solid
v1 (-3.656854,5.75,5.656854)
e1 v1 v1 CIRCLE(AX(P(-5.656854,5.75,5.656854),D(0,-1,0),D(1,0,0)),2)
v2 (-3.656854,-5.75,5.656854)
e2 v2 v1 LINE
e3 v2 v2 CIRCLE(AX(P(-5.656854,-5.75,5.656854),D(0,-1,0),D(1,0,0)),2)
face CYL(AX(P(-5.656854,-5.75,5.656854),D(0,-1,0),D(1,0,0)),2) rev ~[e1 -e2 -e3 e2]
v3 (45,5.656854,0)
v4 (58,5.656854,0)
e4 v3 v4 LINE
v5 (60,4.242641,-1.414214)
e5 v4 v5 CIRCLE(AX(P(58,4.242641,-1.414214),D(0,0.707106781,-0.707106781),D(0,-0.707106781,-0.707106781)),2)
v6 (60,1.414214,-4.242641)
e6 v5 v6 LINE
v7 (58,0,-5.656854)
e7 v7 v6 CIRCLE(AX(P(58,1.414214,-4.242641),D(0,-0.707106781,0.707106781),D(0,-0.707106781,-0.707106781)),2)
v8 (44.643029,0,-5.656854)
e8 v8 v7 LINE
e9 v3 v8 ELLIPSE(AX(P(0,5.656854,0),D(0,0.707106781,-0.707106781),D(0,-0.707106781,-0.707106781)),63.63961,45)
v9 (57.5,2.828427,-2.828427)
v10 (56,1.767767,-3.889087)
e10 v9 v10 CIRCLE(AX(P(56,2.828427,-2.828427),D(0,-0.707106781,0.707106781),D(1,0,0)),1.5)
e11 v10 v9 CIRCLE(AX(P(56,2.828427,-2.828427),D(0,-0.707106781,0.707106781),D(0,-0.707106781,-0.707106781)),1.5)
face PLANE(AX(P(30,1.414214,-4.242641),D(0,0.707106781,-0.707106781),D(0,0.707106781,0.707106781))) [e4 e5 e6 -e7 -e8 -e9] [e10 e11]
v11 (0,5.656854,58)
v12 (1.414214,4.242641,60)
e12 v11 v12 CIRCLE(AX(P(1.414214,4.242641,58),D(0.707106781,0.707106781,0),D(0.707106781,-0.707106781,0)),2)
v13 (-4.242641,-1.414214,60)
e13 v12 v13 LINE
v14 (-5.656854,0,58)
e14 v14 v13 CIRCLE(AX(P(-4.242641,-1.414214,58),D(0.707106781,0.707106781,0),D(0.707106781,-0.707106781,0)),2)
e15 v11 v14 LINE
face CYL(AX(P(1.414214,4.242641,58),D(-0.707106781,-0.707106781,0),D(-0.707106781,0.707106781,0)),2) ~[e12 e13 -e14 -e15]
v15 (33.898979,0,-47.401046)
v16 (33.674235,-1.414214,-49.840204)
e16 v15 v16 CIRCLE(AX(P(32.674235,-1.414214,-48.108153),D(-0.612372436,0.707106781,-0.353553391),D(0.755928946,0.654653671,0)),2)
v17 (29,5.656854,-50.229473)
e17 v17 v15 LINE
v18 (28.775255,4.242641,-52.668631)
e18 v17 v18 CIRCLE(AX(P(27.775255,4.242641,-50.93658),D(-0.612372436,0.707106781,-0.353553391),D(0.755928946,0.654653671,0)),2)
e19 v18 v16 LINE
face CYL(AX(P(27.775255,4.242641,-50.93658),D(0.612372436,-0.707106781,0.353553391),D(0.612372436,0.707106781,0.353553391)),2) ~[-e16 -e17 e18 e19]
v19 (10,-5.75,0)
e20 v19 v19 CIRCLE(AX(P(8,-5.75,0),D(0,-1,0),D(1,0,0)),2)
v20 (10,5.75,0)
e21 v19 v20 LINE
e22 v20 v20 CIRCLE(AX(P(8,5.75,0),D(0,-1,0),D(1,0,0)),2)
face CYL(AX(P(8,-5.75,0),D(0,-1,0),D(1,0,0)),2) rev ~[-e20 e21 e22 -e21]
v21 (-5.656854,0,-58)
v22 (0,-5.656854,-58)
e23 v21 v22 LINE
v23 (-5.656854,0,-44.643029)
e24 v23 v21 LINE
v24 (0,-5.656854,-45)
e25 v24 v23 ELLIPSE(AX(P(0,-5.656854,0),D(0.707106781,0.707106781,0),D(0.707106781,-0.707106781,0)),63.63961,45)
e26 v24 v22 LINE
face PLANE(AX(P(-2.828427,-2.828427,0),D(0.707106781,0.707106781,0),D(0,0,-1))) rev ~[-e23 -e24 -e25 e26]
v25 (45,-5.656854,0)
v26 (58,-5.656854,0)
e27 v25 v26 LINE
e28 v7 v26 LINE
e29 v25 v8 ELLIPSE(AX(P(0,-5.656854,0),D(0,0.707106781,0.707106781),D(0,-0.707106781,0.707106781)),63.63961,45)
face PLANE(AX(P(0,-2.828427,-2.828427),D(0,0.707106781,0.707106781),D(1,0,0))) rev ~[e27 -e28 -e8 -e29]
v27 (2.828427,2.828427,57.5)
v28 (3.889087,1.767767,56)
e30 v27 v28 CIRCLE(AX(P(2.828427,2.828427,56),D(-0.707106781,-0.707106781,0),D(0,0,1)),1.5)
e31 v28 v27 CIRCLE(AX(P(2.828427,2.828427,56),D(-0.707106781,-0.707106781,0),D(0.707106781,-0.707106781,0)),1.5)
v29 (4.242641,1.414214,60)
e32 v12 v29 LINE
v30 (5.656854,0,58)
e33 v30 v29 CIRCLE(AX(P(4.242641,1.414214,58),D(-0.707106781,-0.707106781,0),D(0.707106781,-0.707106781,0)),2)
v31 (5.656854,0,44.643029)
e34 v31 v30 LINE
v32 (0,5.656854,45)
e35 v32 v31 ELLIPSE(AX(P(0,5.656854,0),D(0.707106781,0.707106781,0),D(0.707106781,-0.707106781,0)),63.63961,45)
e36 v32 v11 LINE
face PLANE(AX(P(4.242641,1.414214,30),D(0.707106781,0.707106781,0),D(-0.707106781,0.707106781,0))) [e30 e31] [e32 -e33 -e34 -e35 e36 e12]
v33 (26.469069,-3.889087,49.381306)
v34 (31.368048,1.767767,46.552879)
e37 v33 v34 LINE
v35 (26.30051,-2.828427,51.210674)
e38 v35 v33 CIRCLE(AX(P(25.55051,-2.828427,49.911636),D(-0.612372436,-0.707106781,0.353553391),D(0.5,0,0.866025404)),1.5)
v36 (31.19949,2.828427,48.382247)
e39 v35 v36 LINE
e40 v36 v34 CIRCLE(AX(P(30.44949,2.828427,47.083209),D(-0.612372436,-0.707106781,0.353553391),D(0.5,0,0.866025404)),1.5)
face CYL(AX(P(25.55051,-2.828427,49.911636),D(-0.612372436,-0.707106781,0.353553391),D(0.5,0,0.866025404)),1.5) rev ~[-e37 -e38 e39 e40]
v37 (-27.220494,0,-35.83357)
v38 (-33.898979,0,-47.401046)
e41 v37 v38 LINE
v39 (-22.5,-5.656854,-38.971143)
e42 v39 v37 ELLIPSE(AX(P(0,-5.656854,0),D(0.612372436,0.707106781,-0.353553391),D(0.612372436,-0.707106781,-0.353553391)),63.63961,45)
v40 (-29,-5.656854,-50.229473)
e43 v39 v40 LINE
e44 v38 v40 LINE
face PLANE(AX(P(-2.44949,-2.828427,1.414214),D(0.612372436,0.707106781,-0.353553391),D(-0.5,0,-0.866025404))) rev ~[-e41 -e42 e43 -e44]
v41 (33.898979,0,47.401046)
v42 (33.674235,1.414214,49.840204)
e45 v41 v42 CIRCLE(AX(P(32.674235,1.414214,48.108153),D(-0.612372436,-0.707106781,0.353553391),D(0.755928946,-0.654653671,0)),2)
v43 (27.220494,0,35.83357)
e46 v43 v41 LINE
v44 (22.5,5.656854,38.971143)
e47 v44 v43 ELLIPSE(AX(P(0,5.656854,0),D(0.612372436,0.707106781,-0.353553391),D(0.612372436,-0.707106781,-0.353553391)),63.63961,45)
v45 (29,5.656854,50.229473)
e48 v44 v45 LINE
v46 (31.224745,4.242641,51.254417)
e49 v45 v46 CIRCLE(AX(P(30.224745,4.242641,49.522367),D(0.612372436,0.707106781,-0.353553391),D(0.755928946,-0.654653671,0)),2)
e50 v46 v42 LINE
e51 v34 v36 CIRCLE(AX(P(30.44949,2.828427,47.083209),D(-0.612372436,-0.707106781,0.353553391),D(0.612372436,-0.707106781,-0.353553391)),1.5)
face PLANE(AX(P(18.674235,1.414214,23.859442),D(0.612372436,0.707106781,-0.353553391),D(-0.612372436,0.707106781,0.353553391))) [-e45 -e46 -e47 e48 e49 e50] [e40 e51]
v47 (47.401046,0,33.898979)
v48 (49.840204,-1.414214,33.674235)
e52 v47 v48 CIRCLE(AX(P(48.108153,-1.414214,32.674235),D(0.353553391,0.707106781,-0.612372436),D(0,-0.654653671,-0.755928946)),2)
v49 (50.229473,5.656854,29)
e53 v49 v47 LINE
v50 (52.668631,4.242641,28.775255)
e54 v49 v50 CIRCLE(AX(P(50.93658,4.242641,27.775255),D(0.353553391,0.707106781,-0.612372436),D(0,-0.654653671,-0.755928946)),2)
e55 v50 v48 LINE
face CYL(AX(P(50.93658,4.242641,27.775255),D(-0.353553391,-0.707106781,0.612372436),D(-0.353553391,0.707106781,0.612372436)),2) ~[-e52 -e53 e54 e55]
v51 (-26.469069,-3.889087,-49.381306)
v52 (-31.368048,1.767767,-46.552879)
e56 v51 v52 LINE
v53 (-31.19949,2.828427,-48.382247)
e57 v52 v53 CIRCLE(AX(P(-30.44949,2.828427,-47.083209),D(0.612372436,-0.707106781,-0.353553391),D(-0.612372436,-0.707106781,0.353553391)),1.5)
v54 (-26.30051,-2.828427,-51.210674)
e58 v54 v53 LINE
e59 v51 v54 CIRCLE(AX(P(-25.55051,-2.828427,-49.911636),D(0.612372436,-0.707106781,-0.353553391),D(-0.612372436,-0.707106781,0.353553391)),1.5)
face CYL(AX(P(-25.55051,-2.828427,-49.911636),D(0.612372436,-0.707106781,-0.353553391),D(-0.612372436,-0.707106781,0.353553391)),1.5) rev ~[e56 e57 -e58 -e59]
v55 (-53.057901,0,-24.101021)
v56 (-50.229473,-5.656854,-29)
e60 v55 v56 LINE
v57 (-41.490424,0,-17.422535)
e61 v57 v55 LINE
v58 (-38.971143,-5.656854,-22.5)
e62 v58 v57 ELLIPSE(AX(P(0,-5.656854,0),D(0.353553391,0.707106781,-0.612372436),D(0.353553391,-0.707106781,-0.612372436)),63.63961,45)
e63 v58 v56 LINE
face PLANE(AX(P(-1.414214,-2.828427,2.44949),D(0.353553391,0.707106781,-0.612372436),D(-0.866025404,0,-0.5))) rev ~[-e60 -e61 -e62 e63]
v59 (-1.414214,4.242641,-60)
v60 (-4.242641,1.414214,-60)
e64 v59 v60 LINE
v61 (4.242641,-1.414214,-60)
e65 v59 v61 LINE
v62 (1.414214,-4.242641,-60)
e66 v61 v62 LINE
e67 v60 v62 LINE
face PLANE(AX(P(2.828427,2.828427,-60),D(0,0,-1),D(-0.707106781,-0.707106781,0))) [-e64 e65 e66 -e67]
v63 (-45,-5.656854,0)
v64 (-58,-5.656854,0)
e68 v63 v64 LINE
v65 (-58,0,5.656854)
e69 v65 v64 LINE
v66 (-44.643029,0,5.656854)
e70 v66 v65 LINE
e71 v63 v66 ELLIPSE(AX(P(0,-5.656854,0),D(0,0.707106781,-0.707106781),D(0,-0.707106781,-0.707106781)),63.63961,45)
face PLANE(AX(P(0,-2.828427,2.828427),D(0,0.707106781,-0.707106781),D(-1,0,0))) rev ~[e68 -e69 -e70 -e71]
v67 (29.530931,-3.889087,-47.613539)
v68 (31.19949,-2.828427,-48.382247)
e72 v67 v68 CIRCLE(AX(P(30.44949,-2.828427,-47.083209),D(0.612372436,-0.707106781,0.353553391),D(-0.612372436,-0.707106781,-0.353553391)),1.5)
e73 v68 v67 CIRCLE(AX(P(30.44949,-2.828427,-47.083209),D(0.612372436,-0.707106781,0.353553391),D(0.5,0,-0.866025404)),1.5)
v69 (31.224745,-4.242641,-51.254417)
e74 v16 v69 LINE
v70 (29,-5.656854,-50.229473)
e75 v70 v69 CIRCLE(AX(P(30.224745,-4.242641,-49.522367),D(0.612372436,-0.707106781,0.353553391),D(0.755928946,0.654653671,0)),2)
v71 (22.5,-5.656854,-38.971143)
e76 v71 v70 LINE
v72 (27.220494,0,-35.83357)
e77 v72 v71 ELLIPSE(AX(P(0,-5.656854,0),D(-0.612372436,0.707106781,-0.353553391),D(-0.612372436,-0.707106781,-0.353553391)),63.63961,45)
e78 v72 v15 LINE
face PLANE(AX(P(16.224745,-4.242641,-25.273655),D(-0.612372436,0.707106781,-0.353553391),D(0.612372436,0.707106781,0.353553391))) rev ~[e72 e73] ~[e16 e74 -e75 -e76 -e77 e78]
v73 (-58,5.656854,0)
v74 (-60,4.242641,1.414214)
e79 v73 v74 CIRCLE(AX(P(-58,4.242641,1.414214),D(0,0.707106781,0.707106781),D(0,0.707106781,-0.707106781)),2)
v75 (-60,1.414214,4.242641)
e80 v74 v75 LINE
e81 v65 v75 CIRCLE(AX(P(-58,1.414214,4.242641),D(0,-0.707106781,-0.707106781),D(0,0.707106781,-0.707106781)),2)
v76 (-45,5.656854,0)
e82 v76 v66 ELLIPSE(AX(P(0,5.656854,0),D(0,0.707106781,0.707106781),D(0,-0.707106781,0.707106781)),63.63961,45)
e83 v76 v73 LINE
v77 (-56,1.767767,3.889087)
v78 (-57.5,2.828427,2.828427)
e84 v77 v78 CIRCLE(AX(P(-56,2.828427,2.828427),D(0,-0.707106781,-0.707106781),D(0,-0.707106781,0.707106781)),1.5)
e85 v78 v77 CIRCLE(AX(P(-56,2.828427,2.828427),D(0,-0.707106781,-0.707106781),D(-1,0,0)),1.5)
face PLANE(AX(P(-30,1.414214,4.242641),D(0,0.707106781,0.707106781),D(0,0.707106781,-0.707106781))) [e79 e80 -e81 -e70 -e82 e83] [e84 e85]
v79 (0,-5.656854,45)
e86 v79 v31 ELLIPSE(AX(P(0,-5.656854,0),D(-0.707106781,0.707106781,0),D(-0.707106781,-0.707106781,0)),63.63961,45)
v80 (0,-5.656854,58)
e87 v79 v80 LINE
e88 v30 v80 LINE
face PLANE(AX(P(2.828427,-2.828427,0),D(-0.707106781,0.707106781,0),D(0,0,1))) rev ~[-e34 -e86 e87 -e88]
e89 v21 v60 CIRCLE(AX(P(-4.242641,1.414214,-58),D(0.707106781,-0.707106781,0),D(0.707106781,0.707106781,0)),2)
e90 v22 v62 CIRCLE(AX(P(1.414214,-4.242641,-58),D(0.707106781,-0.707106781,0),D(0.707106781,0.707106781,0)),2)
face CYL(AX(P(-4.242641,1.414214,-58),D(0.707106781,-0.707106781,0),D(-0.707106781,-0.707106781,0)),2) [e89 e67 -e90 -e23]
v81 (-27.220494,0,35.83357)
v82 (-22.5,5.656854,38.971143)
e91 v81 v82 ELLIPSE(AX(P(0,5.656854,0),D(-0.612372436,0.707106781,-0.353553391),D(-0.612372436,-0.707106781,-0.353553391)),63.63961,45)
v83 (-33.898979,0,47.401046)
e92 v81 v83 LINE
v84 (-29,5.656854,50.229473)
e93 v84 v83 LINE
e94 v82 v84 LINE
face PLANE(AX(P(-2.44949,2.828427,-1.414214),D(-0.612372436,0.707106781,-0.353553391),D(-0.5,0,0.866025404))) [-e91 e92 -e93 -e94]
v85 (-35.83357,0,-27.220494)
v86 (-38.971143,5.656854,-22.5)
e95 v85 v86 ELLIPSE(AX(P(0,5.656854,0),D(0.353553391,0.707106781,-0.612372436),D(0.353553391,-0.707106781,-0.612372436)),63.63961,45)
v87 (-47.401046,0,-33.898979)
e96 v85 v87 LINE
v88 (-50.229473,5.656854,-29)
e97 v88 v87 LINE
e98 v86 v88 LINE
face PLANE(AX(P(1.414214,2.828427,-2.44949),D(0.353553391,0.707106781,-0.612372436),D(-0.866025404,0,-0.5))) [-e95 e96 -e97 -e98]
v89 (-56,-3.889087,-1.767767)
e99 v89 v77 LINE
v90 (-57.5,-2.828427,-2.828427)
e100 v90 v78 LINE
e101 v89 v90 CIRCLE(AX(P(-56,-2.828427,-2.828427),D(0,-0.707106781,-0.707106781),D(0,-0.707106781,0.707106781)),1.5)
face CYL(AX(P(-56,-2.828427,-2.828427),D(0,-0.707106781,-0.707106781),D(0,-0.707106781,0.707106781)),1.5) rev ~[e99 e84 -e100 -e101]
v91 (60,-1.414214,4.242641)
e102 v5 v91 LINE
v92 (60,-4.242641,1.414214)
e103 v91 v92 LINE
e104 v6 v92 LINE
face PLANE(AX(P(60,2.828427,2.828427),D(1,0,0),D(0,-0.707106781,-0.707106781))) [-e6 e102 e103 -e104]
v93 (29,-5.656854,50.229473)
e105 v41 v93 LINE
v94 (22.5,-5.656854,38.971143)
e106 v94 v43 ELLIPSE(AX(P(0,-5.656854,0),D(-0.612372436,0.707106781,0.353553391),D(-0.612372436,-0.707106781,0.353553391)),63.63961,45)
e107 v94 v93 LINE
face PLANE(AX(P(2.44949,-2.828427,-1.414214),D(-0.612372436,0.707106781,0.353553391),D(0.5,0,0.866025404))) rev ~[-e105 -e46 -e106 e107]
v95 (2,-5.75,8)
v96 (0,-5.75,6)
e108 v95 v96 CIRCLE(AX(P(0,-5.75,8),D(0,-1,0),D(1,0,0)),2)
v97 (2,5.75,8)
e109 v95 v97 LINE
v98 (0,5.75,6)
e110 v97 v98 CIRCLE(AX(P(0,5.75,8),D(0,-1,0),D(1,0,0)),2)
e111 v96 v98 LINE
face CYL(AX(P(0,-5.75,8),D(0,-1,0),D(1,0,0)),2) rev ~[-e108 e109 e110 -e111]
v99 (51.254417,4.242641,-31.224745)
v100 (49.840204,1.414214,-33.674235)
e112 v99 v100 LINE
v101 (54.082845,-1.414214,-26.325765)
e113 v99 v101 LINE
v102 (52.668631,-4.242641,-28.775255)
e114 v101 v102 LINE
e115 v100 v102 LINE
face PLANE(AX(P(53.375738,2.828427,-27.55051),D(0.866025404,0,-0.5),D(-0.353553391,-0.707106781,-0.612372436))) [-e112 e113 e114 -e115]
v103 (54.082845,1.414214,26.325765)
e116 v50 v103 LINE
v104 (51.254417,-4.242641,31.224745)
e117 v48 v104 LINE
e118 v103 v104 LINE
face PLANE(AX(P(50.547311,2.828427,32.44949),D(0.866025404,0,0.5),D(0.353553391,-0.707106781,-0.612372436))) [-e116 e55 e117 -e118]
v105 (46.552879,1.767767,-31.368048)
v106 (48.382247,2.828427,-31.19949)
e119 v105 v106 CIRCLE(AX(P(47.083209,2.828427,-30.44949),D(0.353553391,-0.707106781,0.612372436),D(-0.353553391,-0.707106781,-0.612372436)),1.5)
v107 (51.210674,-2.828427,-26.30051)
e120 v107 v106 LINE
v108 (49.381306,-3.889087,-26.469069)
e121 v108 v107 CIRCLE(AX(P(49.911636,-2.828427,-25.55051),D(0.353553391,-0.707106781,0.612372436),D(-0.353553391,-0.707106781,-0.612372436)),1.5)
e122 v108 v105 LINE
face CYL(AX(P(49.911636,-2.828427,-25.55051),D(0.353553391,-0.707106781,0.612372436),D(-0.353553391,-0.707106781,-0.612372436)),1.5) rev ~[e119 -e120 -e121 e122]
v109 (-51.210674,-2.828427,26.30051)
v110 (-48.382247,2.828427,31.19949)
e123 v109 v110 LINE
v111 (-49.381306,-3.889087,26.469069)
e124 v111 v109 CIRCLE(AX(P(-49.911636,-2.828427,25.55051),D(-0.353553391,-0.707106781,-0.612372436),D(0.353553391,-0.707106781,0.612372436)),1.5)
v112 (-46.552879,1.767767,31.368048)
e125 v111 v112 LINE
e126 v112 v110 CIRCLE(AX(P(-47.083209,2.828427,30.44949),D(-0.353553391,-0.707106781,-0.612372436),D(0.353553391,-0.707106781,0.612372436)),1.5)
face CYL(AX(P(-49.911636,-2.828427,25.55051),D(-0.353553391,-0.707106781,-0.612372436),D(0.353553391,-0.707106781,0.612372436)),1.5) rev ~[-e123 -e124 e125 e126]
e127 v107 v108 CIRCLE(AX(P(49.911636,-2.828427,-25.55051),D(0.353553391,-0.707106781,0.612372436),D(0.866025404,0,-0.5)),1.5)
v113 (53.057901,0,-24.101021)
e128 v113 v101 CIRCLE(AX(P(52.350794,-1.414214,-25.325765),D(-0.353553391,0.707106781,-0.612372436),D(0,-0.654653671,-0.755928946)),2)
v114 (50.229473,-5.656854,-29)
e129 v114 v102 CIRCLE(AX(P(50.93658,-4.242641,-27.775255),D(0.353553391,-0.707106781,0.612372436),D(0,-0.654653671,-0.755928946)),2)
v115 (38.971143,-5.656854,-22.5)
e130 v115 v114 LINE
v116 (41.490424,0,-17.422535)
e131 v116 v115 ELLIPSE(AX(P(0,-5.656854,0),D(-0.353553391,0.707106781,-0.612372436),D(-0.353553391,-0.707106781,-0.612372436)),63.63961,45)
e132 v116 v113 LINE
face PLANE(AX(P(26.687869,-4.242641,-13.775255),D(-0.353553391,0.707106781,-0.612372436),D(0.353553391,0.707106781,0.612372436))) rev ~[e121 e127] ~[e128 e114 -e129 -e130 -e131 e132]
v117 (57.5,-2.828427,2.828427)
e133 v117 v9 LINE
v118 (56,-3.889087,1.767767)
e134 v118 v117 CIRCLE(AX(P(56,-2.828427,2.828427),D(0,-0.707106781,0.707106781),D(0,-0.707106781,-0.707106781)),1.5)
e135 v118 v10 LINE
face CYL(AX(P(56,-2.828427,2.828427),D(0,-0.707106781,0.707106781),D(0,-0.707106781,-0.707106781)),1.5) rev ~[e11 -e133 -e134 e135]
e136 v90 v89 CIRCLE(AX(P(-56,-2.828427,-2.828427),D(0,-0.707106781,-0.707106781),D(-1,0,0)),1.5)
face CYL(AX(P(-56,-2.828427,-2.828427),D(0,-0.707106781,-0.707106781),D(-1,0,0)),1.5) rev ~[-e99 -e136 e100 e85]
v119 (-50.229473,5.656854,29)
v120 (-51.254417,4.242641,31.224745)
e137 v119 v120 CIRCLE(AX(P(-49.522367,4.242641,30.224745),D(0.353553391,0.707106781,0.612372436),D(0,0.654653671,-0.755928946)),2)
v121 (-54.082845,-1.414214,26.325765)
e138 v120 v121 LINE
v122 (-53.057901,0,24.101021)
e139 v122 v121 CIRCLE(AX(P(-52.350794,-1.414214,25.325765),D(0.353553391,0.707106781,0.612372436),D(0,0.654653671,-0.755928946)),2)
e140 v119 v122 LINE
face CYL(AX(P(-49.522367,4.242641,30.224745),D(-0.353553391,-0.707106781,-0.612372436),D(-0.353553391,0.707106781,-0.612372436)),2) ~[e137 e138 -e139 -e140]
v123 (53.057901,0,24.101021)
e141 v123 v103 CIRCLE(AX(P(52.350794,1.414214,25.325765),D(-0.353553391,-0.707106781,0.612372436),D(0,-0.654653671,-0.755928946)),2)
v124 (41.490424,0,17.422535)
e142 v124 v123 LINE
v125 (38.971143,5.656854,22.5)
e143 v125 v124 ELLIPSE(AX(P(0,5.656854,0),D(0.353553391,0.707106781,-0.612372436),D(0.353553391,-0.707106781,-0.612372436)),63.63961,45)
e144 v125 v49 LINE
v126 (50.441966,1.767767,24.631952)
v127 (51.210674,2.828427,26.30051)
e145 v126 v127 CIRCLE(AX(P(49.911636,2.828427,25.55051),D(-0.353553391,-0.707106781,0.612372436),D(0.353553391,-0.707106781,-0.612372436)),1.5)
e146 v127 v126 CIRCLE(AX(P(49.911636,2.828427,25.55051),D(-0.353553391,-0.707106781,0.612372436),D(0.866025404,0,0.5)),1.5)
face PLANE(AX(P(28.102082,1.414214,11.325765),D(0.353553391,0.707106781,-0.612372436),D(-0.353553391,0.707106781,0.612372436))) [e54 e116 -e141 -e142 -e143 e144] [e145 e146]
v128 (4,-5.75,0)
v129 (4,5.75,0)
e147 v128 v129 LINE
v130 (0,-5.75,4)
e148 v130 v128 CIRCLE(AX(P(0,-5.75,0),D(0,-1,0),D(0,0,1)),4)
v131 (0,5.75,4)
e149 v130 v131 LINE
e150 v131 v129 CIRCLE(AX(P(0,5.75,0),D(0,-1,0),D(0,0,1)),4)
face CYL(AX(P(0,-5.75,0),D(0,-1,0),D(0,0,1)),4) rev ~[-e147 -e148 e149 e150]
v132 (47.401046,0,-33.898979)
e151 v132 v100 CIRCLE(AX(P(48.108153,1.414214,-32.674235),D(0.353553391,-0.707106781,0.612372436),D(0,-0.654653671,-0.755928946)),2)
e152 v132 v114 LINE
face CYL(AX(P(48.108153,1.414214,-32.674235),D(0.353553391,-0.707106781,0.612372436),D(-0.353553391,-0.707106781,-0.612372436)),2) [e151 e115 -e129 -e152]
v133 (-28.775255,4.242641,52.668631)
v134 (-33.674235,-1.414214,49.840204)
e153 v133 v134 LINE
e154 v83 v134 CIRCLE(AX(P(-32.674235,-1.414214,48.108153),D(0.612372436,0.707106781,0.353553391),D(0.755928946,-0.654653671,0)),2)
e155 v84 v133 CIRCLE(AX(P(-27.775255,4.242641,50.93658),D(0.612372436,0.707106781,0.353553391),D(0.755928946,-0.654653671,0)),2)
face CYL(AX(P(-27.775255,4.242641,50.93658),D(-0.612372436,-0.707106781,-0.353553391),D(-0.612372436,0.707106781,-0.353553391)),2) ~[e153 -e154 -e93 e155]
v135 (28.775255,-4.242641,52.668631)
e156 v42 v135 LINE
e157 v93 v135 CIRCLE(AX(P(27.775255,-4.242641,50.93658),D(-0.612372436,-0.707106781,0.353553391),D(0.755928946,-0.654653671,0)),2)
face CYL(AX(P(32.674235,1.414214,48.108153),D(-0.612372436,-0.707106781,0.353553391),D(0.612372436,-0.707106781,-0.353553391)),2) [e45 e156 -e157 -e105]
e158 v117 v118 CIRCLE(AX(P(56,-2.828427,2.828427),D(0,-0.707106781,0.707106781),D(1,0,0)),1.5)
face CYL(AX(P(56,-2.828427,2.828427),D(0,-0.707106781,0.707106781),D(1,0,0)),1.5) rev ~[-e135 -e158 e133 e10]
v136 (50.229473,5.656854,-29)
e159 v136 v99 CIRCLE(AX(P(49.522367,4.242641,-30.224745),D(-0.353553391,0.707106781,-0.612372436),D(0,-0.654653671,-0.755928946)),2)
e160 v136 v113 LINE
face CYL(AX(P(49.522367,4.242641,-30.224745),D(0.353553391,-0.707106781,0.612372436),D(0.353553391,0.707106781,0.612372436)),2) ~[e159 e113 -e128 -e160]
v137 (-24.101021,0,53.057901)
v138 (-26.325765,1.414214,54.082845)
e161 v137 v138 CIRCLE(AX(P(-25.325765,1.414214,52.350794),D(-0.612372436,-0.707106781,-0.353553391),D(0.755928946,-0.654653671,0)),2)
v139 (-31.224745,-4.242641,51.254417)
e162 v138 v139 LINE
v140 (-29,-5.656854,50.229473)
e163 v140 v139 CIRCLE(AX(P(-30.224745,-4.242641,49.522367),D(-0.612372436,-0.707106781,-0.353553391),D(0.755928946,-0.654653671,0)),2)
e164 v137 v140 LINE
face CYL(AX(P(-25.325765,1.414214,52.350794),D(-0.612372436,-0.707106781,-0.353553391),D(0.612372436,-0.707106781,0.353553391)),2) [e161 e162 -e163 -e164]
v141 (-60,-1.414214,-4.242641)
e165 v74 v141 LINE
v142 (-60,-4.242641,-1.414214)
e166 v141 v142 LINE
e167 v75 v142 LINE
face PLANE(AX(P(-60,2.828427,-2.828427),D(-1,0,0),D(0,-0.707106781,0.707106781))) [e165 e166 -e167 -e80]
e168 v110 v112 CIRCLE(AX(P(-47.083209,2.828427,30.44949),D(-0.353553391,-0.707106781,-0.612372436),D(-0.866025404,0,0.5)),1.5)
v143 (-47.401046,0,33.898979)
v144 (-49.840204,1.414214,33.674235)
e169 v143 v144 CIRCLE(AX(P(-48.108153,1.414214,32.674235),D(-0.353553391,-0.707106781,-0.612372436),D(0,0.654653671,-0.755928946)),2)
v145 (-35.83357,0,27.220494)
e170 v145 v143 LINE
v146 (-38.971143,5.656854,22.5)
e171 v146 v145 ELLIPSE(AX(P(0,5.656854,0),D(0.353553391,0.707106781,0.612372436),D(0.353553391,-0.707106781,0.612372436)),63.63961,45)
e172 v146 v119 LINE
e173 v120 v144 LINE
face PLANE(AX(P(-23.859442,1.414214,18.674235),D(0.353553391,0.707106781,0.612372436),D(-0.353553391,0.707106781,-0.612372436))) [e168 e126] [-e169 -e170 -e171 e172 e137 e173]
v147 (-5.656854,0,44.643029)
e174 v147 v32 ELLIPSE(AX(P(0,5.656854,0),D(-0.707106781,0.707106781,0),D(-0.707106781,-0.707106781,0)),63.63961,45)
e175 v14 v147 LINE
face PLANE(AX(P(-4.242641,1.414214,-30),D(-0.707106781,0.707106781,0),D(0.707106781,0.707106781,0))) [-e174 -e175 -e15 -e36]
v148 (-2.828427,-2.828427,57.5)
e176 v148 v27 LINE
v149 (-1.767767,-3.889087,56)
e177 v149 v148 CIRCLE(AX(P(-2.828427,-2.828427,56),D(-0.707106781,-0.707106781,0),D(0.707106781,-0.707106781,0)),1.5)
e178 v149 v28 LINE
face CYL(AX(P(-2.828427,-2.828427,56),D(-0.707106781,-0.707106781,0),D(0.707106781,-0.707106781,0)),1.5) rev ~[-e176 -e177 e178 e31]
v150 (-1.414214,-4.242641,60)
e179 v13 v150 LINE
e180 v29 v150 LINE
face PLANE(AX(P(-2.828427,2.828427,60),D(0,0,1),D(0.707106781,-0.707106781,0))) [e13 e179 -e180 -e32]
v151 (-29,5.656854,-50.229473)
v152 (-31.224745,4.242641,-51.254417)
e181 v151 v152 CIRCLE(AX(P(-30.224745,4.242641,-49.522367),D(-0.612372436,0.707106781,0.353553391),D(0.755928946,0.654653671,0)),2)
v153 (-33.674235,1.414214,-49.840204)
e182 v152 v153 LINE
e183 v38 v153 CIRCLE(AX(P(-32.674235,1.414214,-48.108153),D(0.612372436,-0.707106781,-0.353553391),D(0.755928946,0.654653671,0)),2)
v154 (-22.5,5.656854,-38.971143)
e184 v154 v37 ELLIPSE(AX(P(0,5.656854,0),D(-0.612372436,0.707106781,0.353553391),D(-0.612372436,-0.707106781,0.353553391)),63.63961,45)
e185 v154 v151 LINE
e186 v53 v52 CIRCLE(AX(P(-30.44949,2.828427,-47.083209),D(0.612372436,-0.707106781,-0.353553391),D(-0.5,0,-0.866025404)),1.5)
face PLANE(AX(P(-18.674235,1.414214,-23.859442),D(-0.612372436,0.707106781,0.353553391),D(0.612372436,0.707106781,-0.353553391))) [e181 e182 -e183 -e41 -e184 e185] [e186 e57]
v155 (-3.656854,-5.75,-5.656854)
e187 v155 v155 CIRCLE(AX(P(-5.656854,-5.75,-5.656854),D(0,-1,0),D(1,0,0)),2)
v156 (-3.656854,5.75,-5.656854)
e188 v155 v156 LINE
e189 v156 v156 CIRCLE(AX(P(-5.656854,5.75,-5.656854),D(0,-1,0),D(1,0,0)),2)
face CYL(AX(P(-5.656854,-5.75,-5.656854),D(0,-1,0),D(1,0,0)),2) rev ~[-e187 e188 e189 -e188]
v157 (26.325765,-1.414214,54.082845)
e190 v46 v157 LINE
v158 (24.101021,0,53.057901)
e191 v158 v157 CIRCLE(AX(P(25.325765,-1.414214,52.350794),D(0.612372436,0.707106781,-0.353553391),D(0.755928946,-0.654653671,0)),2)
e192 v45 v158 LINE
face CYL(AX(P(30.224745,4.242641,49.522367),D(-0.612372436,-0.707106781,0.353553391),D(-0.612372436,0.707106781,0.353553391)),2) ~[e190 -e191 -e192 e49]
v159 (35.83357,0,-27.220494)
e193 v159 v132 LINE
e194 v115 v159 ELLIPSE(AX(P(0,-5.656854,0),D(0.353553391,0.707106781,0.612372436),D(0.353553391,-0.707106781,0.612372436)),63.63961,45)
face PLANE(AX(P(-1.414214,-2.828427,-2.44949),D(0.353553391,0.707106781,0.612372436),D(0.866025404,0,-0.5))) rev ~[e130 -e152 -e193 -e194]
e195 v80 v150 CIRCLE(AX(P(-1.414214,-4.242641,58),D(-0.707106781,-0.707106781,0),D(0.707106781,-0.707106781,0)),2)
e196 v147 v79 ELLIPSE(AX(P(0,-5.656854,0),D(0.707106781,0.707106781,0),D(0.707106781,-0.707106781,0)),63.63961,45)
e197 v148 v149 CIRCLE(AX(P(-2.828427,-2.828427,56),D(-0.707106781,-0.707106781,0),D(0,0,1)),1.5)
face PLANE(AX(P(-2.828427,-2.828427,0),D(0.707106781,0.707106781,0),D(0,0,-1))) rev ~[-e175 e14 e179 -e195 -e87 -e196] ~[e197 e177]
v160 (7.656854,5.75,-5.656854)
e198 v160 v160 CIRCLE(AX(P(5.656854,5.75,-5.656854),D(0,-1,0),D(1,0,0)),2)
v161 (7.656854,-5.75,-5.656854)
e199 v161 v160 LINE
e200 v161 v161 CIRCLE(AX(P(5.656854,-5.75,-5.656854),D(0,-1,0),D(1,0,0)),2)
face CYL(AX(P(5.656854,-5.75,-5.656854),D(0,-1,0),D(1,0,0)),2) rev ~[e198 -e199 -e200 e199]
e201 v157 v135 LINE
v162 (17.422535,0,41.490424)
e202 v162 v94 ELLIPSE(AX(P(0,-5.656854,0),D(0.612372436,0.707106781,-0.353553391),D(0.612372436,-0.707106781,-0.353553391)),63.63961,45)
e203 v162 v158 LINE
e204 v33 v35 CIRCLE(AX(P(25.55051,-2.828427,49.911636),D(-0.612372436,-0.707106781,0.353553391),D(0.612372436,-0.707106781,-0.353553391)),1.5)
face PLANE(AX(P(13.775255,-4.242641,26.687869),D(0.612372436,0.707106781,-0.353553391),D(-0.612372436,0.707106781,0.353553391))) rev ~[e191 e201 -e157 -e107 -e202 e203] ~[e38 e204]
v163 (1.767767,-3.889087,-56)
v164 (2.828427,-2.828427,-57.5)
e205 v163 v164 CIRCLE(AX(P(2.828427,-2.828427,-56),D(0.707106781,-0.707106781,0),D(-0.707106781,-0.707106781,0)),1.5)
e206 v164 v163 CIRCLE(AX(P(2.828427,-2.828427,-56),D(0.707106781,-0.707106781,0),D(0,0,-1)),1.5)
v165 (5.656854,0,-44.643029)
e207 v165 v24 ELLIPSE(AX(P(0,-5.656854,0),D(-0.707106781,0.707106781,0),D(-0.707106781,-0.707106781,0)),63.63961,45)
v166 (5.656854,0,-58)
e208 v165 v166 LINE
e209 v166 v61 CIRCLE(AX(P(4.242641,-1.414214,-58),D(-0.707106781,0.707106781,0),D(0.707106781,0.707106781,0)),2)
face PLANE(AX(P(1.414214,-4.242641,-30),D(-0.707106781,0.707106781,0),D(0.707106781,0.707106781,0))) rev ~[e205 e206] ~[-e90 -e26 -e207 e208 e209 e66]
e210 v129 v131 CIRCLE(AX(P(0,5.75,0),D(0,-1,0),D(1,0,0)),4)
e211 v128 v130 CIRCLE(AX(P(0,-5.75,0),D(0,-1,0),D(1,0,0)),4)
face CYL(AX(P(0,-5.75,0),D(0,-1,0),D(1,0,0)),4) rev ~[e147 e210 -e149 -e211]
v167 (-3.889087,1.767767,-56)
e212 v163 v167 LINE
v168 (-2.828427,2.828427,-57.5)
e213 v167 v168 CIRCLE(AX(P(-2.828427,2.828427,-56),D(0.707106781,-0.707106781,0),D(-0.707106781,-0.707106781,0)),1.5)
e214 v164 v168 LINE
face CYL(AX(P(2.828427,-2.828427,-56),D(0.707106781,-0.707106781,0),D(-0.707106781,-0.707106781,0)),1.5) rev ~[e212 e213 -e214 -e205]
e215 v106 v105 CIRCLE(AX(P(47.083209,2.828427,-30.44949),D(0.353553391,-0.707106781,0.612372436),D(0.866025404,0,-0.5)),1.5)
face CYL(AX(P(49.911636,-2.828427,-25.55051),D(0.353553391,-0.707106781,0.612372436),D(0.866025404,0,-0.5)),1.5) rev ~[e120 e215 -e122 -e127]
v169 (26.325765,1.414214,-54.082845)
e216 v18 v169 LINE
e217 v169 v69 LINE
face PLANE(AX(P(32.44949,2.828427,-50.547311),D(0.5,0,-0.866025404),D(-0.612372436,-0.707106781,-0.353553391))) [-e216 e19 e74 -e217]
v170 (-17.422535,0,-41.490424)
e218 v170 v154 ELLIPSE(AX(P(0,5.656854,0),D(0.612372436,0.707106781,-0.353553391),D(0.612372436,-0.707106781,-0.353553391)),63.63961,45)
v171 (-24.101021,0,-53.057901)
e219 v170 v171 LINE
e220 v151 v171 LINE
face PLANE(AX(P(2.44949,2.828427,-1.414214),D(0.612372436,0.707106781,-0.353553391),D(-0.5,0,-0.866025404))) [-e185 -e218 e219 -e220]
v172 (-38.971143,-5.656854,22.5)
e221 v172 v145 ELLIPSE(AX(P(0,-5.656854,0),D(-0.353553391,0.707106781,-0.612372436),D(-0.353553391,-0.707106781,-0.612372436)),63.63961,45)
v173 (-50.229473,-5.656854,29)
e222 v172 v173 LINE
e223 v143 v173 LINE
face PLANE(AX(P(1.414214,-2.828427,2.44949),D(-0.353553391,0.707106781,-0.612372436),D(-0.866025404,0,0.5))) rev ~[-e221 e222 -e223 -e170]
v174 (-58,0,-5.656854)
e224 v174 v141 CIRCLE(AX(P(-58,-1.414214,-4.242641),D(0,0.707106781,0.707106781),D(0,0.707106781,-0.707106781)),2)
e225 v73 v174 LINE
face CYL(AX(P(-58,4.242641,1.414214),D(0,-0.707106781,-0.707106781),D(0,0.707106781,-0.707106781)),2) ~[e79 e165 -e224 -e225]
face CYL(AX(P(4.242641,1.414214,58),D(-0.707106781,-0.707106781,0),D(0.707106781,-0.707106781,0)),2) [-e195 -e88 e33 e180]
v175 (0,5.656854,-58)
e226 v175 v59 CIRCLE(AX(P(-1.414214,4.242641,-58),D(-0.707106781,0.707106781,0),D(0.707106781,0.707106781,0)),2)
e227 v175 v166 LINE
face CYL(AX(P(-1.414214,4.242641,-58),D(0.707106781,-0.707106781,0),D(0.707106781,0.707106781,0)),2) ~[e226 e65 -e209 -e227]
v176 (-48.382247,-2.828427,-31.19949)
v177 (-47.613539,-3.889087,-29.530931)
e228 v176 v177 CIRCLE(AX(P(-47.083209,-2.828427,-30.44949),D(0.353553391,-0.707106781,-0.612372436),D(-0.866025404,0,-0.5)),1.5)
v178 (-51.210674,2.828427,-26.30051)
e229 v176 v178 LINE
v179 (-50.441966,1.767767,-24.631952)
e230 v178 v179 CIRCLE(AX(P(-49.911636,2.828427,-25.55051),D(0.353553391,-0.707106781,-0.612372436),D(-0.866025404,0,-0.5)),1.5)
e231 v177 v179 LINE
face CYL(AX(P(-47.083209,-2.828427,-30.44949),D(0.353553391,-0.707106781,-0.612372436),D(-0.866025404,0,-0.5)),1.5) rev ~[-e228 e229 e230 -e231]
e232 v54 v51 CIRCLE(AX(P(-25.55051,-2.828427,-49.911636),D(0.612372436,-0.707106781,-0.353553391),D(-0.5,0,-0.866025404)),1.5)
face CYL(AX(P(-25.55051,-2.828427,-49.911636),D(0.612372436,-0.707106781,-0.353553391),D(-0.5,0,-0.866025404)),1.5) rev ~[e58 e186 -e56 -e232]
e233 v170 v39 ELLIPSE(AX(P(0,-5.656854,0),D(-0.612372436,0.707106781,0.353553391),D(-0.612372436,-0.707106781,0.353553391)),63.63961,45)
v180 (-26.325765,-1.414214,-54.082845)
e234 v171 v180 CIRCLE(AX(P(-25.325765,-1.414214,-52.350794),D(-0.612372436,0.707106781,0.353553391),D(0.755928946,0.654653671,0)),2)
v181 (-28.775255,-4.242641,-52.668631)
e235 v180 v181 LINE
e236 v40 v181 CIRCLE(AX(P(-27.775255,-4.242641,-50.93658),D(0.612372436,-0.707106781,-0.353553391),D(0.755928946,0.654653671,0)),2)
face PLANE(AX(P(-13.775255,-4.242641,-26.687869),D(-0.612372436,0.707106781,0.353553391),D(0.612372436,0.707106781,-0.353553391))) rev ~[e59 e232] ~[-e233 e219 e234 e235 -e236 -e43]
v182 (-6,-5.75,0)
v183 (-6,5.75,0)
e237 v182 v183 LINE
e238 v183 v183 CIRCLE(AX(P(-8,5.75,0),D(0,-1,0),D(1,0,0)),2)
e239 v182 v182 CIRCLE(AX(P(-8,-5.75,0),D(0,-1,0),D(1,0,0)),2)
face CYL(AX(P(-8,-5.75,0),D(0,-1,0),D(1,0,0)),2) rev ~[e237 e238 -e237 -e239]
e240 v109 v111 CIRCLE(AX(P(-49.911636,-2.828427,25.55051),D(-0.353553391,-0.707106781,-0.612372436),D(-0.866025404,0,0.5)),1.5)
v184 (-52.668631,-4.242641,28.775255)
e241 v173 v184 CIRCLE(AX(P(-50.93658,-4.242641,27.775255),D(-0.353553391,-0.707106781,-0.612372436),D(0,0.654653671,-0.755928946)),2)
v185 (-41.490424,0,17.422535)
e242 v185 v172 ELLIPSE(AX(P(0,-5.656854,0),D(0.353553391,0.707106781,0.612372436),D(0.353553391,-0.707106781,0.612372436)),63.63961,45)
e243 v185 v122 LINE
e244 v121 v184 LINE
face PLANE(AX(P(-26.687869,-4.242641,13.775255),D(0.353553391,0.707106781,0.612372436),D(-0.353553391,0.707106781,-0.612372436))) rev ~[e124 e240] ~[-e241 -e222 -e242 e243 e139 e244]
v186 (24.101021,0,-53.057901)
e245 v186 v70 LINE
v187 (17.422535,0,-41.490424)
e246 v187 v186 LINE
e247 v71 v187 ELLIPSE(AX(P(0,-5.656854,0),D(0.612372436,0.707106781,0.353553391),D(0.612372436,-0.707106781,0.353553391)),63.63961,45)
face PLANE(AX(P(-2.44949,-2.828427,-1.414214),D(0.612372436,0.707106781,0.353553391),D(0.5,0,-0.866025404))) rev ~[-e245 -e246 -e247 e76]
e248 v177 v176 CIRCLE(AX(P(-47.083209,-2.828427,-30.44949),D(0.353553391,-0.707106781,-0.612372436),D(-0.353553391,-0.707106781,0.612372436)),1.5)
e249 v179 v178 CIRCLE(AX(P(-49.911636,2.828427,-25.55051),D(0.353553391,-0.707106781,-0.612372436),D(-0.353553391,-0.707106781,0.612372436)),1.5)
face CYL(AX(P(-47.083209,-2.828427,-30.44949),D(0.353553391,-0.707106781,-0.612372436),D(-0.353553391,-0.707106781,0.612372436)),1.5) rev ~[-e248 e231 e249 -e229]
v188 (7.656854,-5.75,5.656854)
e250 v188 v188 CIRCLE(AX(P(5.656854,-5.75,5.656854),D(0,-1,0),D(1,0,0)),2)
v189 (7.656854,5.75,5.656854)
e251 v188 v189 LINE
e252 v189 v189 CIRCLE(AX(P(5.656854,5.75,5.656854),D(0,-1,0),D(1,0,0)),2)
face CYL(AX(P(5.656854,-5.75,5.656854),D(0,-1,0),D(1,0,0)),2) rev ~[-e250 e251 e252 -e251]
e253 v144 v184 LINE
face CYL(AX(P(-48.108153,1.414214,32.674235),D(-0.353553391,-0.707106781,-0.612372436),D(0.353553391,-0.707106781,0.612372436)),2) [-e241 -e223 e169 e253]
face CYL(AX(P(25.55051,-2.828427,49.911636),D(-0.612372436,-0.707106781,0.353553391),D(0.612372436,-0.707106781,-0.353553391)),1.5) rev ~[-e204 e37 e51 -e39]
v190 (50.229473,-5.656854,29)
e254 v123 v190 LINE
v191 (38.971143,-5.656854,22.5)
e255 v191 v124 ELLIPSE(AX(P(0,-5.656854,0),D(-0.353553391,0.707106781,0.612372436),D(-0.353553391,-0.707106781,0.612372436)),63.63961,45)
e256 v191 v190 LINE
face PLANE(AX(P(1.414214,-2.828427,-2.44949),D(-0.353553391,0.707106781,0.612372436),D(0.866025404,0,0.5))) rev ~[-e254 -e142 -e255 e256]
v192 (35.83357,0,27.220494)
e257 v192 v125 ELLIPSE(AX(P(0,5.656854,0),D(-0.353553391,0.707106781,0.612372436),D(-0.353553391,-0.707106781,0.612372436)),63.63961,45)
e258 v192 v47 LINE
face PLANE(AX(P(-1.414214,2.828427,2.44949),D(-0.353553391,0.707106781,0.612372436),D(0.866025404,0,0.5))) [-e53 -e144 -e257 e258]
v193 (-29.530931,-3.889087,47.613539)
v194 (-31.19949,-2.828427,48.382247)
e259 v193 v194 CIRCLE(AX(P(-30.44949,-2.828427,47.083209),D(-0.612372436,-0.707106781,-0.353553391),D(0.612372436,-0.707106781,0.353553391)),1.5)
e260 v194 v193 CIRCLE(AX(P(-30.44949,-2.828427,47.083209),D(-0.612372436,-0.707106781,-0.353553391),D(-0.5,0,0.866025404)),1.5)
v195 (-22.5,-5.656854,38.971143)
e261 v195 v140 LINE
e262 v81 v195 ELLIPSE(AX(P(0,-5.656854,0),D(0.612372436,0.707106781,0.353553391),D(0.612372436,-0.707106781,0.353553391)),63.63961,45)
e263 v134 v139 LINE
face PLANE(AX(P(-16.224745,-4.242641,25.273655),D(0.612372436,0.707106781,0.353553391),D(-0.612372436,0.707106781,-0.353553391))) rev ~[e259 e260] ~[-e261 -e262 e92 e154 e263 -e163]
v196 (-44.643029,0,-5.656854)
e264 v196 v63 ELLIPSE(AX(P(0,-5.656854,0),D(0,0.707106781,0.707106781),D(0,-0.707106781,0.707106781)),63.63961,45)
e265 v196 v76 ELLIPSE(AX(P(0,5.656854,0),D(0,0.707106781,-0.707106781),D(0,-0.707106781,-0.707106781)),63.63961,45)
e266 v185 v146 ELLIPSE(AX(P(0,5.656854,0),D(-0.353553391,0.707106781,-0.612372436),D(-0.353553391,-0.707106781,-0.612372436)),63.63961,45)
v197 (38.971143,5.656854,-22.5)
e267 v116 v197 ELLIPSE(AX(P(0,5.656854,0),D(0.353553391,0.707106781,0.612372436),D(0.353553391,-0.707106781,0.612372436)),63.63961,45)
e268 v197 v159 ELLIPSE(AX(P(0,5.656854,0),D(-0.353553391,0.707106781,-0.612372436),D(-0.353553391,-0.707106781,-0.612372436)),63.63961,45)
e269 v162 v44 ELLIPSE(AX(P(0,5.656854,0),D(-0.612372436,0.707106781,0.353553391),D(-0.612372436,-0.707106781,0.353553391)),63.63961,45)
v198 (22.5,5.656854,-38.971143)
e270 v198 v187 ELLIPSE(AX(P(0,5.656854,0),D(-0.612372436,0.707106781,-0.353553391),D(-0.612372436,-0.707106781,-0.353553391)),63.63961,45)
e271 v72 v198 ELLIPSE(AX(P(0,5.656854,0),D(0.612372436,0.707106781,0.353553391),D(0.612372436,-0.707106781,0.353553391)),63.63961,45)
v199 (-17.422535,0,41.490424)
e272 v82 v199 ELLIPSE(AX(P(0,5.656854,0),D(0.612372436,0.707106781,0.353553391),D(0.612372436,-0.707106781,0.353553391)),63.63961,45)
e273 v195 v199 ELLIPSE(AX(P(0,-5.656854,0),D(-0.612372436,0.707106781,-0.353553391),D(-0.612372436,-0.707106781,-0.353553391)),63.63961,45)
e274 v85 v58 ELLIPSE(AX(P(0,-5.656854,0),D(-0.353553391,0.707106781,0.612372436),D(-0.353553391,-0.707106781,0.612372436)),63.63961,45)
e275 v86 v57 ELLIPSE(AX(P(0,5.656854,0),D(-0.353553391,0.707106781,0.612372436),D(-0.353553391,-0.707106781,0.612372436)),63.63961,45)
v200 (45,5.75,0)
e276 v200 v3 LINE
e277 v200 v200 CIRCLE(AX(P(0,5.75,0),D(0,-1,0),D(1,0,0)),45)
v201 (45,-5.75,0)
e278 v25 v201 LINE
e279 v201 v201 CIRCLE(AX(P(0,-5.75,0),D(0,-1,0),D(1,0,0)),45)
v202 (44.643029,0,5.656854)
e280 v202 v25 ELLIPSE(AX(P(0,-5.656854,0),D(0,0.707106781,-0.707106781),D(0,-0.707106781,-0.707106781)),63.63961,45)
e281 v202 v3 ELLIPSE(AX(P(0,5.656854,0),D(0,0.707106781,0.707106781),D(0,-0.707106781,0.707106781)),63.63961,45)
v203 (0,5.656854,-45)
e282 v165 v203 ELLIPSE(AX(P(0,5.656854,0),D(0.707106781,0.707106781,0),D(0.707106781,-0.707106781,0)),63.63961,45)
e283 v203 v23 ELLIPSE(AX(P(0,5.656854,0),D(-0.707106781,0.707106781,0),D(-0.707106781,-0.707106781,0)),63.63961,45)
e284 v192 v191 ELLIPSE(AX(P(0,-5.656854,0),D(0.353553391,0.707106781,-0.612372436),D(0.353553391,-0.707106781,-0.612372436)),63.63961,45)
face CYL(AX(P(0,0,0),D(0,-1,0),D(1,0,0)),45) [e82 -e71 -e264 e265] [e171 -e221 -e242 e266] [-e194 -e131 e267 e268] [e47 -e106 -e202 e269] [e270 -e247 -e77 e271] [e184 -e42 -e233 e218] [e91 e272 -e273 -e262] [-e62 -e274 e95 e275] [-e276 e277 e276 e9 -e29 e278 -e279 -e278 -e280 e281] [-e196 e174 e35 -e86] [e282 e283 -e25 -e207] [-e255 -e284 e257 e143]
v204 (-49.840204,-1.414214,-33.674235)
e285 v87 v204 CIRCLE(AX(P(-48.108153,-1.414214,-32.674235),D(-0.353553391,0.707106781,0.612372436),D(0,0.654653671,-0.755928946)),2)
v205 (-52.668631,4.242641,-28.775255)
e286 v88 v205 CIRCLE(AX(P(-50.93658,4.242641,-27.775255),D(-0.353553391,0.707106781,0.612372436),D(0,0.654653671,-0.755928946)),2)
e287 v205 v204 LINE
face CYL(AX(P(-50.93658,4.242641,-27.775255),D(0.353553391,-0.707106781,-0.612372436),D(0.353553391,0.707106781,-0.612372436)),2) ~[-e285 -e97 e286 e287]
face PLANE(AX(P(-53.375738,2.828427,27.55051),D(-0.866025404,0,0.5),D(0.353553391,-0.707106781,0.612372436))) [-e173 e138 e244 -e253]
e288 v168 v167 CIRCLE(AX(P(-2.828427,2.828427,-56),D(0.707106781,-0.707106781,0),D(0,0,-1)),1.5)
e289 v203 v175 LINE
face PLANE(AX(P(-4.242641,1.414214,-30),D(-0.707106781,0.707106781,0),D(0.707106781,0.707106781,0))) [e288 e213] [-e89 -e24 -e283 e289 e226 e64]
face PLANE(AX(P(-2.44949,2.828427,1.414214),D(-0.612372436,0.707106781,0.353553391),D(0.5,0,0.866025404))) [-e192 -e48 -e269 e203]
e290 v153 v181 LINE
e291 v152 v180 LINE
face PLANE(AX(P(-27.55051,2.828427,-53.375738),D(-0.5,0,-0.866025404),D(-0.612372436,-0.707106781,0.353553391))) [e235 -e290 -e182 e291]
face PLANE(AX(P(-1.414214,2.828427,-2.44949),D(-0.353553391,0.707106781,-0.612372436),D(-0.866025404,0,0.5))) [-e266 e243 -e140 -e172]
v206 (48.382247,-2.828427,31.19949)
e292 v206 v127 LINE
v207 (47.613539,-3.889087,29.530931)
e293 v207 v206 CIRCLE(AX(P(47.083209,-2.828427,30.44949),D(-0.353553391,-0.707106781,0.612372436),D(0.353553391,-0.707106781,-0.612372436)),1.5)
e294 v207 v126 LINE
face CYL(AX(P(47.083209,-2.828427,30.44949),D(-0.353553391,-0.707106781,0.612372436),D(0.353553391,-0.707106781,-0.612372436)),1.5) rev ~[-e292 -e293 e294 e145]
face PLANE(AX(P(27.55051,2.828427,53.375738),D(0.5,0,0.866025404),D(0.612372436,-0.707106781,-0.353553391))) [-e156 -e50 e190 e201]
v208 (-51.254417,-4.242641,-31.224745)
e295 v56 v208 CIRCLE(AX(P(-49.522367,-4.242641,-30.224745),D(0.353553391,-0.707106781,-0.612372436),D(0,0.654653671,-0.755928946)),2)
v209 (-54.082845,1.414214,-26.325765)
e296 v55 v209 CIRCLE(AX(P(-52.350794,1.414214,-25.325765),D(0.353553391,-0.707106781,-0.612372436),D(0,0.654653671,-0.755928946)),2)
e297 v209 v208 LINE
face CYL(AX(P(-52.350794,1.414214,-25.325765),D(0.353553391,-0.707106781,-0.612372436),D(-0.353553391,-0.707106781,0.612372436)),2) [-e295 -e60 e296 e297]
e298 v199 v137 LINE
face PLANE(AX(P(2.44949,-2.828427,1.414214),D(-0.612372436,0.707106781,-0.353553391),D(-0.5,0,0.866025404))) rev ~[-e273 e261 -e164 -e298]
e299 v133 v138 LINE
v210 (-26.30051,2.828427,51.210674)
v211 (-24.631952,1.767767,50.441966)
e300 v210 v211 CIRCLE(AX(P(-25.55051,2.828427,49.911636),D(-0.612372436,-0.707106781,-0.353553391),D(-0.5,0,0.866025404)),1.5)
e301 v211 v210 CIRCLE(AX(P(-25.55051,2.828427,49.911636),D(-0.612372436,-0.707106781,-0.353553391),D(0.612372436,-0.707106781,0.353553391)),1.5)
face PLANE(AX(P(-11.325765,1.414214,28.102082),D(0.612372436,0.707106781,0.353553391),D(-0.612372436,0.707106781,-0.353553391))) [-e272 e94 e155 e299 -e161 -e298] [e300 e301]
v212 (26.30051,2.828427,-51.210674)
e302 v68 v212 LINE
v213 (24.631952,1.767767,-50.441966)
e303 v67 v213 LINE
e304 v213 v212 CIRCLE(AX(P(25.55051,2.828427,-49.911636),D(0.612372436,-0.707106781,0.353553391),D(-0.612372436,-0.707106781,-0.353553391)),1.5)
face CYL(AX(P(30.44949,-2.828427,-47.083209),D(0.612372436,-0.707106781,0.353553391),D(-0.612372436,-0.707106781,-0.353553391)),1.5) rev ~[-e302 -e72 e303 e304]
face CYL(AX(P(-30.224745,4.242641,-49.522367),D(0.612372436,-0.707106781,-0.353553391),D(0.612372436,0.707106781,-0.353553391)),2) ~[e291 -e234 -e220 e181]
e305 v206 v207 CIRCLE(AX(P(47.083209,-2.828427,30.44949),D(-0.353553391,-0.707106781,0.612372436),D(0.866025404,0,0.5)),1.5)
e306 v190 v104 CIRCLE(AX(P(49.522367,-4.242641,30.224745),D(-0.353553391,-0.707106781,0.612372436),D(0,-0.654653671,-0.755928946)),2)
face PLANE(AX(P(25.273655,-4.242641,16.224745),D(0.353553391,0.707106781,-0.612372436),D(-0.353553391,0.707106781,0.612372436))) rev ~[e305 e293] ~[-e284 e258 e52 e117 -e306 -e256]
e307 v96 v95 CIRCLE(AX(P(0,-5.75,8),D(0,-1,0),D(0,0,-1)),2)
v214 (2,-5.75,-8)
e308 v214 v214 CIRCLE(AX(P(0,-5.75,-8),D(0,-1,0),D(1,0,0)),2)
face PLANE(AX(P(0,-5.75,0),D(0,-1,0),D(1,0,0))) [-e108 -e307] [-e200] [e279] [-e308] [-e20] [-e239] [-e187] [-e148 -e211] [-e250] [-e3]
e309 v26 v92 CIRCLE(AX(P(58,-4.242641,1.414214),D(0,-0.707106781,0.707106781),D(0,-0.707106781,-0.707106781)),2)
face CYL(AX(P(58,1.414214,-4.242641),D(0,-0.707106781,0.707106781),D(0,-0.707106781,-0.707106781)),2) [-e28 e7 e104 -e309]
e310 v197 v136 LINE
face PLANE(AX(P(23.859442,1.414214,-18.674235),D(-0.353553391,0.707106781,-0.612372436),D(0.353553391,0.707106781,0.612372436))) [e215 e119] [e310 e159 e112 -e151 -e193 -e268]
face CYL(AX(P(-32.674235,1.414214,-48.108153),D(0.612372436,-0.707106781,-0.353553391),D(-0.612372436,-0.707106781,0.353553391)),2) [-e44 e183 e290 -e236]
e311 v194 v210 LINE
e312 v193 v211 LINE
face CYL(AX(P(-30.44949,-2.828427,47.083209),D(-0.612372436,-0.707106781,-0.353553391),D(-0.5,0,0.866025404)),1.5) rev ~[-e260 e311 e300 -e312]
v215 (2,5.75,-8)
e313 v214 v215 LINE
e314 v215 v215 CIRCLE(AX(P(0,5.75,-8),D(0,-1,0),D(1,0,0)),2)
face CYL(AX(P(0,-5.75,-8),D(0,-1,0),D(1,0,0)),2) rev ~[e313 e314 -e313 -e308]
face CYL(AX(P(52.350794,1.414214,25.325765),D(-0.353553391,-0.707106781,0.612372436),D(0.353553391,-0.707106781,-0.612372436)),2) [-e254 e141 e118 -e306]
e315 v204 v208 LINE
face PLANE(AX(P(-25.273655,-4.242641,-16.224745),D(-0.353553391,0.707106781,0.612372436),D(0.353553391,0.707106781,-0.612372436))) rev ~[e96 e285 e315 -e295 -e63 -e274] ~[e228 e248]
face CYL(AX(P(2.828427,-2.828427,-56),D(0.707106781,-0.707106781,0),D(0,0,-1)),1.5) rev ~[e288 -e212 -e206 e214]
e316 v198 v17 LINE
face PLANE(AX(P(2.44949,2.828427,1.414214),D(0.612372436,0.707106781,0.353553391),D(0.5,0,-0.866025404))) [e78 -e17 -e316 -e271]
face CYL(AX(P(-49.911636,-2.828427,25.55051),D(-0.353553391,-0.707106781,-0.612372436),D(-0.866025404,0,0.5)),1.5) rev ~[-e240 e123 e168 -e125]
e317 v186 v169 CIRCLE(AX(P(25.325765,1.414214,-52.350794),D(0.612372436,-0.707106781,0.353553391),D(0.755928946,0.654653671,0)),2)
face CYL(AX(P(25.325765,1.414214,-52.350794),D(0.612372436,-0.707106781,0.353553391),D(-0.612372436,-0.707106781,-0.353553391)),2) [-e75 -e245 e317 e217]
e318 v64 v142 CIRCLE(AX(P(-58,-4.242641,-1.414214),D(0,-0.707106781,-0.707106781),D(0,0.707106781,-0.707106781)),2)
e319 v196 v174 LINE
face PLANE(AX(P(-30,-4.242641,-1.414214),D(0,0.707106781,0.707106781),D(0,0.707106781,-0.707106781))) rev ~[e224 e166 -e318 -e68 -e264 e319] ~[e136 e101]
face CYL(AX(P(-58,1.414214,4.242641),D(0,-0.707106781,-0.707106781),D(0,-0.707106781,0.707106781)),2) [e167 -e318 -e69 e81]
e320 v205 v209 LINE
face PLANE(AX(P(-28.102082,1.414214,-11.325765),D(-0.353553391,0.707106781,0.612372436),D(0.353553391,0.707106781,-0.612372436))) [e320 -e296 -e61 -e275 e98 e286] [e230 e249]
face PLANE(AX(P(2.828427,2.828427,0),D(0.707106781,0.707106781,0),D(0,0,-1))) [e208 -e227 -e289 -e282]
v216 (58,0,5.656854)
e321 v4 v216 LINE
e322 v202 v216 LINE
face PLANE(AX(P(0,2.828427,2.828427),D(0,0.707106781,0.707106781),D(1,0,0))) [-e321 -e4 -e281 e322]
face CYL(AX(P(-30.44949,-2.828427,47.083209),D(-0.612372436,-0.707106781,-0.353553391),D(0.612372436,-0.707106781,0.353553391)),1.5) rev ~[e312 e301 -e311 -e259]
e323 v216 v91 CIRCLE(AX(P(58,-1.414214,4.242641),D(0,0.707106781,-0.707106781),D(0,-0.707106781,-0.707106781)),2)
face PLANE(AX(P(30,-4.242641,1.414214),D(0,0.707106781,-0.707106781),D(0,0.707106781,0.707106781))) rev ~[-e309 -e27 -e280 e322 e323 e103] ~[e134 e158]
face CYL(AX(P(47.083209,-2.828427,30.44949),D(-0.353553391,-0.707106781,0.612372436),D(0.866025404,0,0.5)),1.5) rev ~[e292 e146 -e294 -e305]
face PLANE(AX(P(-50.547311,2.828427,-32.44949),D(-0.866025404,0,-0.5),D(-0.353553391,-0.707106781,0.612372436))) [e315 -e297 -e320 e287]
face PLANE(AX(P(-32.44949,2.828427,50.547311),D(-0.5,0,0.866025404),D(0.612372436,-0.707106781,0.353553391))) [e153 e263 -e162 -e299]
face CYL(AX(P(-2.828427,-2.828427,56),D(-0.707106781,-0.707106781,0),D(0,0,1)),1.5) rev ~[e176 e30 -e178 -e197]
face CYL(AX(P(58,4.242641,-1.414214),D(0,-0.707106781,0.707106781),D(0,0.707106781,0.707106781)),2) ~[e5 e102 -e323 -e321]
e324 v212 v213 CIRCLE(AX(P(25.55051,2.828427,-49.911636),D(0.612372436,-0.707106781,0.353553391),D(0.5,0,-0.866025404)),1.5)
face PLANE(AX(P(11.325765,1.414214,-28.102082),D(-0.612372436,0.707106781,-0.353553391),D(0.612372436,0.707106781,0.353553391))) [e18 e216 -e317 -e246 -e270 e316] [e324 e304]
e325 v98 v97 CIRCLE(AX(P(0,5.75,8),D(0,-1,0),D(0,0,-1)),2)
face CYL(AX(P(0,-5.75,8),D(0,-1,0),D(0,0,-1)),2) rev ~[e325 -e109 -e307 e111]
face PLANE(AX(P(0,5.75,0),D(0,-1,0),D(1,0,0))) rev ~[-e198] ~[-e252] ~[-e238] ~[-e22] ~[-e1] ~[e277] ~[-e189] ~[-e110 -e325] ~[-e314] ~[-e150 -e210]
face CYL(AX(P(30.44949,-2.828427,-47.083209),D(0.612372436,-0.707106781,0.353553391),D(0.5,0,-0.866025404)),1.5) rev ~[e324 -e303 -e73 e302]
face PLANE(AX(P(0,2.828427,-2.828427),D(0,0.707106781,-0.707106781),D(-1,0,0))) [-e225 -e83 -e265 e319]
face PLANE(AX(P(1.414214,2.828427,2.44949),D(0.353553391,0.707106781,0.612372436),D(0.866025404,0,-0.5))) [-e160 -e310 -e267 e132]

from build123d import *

# Parameters (mm, degrees)
F2_W            = 4
F2_H            = 60
F3_DEPTH        = 4
F3_COPIES_COUNT = 12
F4_R            = 45
F5_DEPTH        = 5.75
F7_DEPTH        = 25
F7_COPIES_COUNT = 12
F8_R            = 2
F9_R            = 2
F10_DEPTH       = 25


# Not quite as in the source:
# - a pattern or mirror of a feature is missing from the dataset's text; its kind, count and spacing are read off the source's solid


with BuildPart() as f3:
    # F2 (on face) → F3 (new body, symmetric)
    with BuildSketch(Plane(origin=(0, 0, 0), x_dir=(-0.7071067812, 0.7071067812, 0), z_dir=(0.7071067812, 0.7071067812, 0))):
        with Locations((-2, 30)):
            Rectangle(F2_W, F2_H)
        with Locations((2, 30)):
            Rectangle(F2_W, F2_H)
    extrude(amount=F3_DEPTH, both=True)

    # F3_copies: F3 ×12 about axis
    f3_copies_axis = Axis((0, 0, 0), (0, 1, 0))


with BuildPart() as f3_1:
    add(f3.part)
    for i in range(1, F3_COPIES_COUNT):
        add(f3.part.rotate(f3_copies_axis, i * 360 / F3_COPIES_COUNT))

    # F4 (on Front) → F5 (join, symmetric)
    with BuildSketch(Plane.XZ):
        Circle(F4_R)
    extrude(amount=F5_DEPTH, both=True)

    # F6 (on face) → F7 (cut)
    with BuildSketch(Plane(origin=(-2.8284271247, -2.8284271247, 0), x_dir=(0.7071067812, -0.7071067812, 0), z_dir=(-0.7071067812, -0.7071067812, 0))):
        with BuildLine():
            ThreePointArc((1.5, 56), (1.0606601718, 57.0606601718), (0, 57.5))
            ThreePointArc((0, 57.5), (-1.0606601718, 54.9393398282), (1.5, 56))
        make_face()
    f7 = extrude(amount=-F7_DEPTH, mode=Mode.SUBTRACT)

    # F7_copies: F7 ×12 about axis
    f7_copies_axis = Axis((0, 0, 0), (0, 1, 0))
    for i in range(1, F7_COPIES_COUNT):
        add(f7.rotate(f7_copies_axis, i * 360 / F7_COPIES_COUNT), mode=Mode.SUBTRACT)

    # F8
    f8_edges = [f3_1.edges().sort_by_distance(p)[0] for p in [
        (2.828427, -2.828427, 60),
        (-2.828427, 2.828427, 60),
        (60, 2.828427, 2.828427),
        (60, -2.828427, -2.828427),
        (53.375738, -2.828427, 27.55051),
        (50.547311, 2.828427, 32.44949),
        (32.44949, -2.828427, 50.547311),
        (27.55051, 2.828427, 53.375738),
        (-32.44949, 2.828427, 50.547311),
        (-27.55051, -2.828427, 53.375738),
        (-53.375738, 2.828427, 27.55051),
        (-50.547311, -2.828427, 32.44949),
        (-60, 2.828427, -2.828427),
        (-60, -2.828427, 2.828427),
        (-50.547311, 2.828427, -32.44949),
        (-53.375738, -2.828427, -27.55051),
        (-27.55051, 2.828427, -53.375738),
        (-32.44949, -2.828427, -50.547311),
        (27.55051, -2.828427, -53.375738),
        (32.44949, 2.828427, -50.547311),
        (50.547311, -2.828427, -32.44949),
        (53.375738, 2.828427, -27.55051),
        (2.828427, 2.828427, -60),
        (-2.828427, -2.828427, -60),
    ]]
    fillet(f8_edges, radius=F8_R)

    # F9 (on face) → F10 (cut)
    with BuildSketch(Plane.XZ.offset(5.75)):
        with BuildLine():
            ThreePointArc((0, 4), (-2.8284271247, -2.8284271247), (4, 0))
            ThreePointArc((4, 0), (2.8284271247, 2.8284271247), (0, 4))
        make_face()
        with BuildLine():
            ThreePointArc((2, 8), (-1.4142135624, 9.4142135624), (0, 6))
            ThreePointArc((0, 6), (1.4142135624, 6.5857864376), (2, 8))
        make_face()
        with Locations((-5.6568542495, 5.6568542495)):
            Circle(F9_R)
        with Locations((-8, 0)):
            Circle(F9_R)
        with Locations((-5.6568542495, -5.6568542495)):
            Circle(F9_R)
        with Locations((0, -8)):
            Circle(F9_R)
        with Locations((5.6568542495, -5.6568542495)):
            Circle(F9_R)
        with Locations((8, 0)):
            Circle(F9_R)
        with Locations((5.6568542495, 5.6568542495)):
            Circle(F9_R)
    extrude(amount=-F10_DEPTH, mode=Mode.SUBTRACT)


solid = f3_1.part
